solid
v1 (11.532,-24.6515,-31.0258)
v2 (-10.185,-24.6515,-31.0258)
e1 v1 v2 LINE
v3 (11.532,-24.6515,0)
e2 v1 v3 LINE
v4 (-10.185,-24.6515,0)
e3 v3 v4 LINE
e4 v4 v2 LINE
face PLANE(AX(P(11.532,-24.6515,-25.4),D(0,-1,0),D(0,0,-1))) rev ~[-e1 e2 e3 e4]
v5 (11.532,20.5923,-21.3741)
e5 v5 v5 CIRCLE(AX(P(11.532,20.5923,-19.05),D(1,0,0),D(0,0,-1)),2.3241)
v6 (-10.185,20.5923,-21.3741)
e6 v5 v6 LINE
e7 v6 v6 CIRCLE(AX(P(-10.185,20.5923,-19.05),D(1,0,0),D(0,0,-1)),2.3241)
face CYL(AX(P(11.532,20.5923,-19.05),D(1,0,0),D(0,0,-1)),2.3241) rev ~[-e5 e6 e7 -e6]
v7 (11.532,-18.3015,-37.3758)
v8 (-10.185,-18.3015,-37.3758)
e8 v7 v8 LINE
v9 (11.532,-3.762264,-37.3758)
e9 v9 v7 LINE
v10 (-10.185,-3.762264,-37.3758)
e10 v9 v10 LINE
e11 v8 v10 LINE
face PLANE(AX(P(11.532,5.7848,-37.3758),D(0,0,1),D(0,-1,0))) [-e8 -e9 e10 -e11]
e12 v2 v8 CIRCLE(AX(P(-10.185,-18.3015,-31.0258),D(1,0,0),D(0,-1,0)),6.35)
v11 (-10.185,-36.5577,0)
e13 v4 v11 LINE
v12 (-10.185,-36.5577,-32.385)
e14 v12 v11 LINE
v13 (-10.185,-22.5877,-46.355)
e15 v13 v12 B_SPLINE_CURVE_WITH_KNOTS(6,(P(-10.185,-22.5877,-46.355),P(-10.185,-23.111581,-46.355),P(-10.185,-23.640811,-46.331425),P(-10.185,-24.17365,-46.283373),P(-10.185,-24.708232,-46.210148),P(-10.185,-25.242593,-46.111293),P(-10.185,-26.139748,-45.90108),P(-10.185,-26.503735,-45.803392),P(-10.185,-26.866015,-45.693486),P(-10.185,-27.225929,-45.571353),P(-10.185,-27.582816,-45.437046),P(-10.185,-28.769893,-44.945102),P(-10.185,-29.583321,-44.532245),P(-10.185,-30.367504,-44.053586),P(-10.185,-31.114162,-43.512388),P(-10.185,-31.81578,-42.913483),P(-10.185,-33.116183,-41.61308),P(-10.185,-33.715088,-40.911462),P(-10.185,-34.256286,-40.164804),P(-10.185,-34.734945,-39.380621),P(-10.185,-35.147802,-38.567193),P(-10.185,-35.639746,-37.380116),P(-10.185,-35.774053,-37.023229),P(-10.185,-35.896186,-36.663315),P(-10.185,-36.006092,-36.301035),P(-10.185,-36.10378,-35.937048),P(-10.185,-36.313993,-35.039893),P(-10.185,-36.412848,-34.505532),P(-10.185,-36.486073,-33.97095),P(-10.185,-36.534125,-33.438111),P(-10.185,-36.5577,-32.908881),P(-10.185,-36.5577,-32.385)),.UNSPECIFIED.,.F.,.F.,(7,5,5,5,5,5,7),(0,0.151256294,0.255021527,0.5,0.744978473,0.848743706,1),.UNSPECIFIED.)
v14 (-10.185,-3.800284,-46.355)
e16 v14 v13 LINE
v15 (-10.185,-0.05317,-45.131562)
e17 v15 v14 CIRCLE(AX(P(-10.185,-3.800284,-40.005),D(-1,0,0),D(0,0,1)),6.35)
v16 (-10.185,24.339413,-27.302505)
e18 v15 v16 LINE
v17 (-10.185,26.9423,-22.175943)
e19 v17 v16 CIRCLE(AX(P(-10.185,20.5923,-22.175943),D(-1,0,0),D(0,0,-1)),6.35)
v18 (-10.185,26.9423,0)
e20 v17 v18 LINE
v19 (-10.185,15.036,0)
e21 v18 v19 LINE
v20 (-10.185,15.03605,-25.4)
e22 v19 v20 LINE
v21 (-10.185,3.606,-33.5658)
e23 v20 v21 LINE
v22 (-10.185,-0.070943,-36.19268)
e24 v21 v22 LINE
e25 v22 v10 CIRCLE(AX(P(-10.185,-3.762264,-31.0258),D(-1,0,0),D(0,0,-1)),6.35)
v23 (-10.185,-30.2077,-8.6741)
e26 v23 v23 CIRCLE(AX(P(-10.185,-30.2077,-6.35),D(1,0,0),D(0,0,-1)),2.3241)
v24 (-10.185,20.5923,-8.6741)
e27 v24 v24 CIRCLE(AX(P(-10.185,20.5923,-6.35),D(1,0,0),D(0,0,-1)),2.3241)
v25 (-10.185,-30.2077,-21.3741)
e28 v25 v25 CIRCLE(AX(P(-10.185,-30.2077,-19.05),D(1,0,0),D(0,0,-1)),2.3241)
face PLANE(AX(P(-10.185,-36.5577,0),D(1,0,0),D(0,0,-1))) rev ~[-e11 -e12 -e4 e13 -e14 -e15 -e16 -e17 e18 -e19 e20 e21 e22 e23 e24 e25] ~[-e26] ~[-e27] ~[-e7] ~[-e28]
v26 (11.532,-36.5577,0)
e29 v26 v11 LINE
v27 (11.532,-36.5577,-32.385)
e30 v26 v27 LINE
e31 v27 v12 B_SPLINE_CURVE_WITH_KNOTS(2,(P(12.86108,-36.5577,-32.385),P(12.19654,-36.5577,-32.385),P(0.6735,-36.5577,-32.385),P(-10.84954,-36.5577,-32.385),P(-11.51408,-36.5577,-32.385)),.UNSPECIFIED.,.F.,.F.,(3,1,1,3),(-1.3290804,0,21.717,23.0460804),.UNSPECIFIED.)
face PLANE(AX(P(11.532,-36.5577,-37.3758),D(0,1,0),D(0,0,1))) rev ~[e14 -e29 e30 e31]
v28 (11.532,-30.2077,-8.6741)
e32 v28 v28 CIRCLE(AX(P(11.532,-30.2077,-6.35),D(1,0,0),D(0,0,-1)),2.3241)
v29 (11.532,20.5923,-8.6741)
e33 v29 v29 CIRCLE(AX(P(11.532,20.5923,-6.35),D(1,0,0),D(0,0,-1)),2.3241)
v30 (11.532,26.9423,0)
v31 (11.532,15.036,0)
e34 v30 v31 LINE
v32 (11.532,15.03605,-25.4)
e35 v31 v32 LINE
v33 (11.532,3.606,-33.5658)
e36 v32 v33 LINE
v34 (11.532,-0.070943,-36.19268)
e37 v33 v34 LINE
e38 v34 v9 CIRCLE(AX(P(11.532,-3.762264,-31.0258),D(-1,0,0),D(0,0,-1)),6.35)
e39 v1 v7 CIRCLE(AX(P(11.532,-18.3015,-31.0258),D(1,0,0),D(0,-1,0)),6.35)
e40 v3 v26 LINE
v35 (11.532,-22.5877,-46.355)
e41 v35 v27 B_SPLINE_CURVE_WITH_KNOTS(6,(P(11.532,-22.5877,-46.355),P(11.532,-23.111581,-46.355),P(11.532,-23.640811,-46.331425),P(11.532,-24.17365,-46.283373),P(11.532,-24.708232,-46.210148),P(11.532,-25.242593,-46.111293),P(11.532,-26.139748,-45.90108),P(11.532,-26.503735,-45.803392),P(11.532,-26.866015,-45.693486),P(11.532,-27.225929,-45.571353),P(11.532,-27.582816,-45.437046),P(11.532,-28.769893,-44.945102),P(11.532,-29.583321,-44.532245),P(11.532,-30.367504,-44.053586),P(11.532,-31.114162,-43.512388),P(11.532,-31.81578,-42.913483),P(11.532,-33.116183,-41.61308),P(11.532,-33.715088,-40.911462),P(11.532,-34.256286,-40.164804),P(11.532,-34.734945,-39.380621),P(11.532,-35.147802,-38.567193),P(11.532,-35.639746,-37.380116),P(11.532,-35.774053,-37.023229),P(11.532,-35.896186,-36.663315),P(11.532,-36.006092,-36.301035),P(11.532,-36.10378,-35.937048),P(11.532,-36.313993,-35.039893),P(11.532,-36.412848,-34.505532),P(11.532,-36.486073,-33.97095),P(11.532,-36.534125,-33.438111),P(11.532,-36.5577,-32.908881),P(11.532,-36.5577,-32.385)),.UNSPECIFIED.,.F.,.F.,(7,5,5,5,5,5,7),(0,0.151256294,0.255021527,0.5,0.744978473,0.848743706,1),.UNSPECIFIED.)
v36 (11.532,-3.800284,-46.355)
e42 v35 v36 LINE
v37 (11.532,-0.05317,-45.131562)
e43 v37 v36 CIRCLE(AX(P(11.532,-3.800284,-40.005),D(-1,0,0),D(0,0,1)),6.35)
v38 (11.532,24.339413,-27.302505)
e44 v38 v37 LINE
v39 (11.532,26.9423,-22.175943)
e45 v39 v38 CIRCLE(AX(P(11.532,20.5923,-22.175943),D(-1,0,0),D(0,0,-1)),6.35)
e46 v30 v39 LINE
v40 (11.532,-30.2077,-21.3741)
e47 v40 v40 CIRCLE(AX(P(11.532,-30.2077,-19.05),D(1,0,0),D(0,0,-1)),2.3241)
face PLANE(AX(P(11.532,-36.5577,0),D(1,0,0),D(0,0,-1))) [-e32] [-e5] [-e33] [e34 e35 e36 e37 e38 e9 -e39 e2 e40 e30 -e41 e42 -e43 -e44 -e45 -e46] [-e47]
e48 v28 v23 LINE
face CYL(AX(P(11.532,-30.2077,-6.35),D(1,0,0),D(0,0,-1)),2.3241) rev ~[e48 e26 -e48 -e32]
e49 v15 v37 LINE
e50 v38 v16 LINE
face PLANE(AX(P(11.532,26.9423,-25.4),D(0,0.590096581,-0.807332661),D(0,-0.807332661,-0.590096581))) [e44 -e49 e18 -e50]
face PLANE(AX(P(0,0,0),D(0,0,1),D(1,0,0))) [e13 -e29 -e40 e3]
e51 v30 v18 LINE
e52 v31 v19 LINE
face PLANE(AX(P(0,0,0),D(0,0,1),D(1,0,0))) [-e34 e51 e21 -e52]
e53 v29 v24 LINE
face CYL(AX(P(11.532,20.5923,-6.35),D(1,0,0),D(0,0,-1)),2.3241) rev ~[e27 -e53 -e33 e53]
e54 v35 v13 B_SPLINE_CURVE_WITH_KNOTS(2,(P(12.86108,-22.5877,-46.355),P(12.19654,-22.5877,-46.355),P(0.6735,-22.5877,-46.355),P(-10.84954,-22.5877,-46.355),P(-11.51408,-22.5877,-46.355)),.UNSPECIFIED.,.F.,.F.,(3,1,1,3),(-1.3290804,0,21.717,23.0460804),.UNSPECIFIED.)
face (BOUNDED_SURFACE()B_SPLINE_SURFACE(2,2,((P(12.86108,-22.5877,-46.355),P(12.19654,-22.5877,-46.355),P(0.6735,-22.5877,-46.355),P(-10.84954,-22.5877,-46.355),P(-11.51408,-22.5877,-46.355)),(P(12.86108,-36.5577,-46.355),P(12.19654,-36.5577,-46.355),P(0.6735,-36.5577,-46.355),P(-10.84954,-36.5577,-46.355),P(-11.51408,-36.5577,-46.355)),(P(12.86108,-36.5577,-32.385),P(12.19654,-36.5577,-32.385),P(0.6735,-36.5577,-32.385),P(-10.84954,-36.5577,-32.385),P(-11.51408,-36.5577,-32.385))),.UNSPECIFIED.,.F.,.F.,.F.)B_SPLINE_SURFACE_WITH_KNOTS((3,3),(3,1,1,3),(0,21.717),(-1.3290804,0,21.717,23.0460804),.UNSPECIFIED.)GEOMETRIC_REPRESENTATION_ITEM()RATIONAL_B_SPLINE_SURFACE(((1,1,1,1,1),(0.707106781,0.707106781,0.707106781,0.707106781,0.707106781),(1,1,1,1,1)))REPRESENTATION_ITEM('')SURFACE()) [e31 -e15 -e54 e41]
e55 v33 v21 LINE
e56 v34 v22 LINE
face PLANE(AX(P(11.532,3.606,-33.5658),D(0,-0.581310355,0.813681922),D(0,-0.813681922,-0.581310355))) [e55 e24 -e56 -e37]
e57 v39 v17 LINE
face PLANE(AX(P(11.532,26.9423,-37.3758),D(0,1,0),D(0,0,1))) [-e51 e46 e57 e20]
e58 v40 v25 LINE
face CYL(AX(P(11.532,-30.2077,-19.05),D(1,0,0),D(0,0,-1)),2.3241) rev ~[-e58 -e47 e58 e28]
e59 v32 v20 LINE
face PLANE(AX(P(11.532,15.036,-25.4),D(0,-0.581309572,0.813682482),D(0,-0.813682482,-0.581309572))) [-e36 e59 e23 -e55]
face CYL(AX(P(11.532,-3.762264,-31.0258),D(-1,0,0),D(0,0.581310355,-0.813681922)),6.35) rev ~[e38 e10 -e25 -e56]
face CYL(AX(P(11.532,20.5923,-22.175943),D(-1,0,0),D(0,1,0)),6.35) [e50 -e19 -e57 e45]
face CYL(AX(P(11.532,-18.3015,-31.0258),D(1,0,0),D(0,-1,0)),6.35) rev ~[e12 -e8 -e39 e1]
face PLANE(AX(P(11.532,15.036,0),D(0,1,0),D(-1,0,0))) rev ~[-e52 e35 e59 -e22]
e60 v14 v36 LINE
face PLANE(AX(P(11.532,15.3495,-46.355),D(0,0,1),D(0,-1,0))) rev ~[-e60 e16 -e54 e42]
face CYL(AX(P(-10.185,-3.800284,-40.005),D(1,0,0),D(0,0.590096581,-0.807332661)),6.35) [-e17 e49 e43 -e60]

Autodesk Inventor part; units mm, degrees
ref_plane "YZ Plane" through (0, 0, 0) normal (1, 0, 0) x (0, 1, 0)
ref_plane "XZ Plane" through (0, 0, 0) normal (0, 1, 0) x (-1, 0, 0)
ref_plane "XY Plane" through (0, 0, 0) normal (0, 0, 1) x (1, 0, 0)
sketch "Sketch4" plane through (0, 0, 0) normal (0, 0, 1) x (1, 0, 0)
  line L0 (10.9923, 14.2423) -> (-9.6452, 14.2423)
  line L1 (11.786, 15.036) -> (11.786, 25.9263)
  line L2 (13.3735, 26.9423) -> (11.786, 26.9423)
  line L3 (-10.439, 15.036) -> (-10.439, 25.9263)
  line L4 (-10.439, 26.9423) -> (-12.0265, 26.9423)
  arc A0 (-10.439, 15.036) -> (-9.6452, 14.2423) centre (-9.6452, 15.036) ccw
  arc A1 (10.9923, 14.2423) -> (11.786, 15.036) centre (10.9923, 15.036) ccw
  arc A2 (11.786, -24.6515) -> (10.9923, -23.8577) centre (10.9923, -24.6515) ccw
  line L5 (-9.6452, -23.8577) -> (10.9923, -23.8577)
  arc A3 (-9.6452, -23.8577) -> (-10.439, -24.6515) centre (-9.6452, -24.6515) ccw
  line L6 (-10.439, -24.6515) -> (-10.439, -36.5577)
  line L7 (11.786, -24.6515) -> (11.786, -36.5577)
  line L8 (11.786, 26.9423) -> (11.786, 25.9263)
  line L9 (-10.439, 26.9423) -> (-10.439, 25.9263)
  line L10 (11.786, -24.6515) -> (-10.439, -24.6515)
  line L11 (11.786, 15.036) -> (-10.439, 15.036)
  line L12 (11.786, 26.9423) -> (11.532, 26.9423)
  line L13 (11.532, 26.9423) -> (11.532, 15.036)
  line L14 (-10.439, 26.9423) -> (-10.185, 26.9423)
  line L15 (-10.185, 26.9423) -> (-10.185, 15.036)
  line L16 (11.532, 26.9423) -> (-10.185, 26.9423)
  line L17 (11.786, -24.6515) -> (11.532, -24.6515)
  line L18 (11.532, -24.6515) -> (11.532, -36.5577)
  line L19 (11.532, -36.5577) -> (11.786, -36.5577)
  line L20 (11.786, -36.5577) -> (11.786, -24.6515)
  line L21 (-10.439, -24.6515) -> (-10.185, -24.6515)
  line L22 (-10.185, -24.6515) -> (-10.185, -36.5577)
  line L23 (-10.185, -36.5577) -> (-10.439, -36.5577)
  line L24 (-10.439, -36.5577) -> (-10.439, -24.6515)
  line L25 (11.532, -36.5577) -> (-10.439, -36.5577)
  line L26 (0, 14.2423) -> (0, -23.8577)
  point P0 (0, 0)
  dimension "d5" = 22.225
  dimension "d6" = 0.254
  dimension "d7" = 0.254
  dimension "d14" = 38.1
extrude "Extrusion2" add sketch "Sketch4" against normal blind 25.4 contours L11 L15 L16 L13 | L18 L25 L22 L10
sketch "Sketch5" plane through (11.532, -36.5577, 0) normal (1, 0, 0) x (0, 0, -1)
  point P0 (0, 36.5577)
sketch "Sketch6" plane through (11.532, -36.5577, 0) normal (1, 0, 0) x (0, 0, -1)
  line L0 (0, 51.5938) -> (0, 63.5) projected
  line L1 (0, 51.5938) -> (25.4, 51.5938) projected
  line L2 (25.4, 63.5) -> (25.4, 51.5938) projected
  line L3 (0, 63.5) -> (25.4, 63.5) projected
  line L4 (0, 0) -> (0, 11.9062) projected
  line L5 (0, 0) -> (25.4, 0) projected
  line L6 (25.4, 11.9062) -> (25.4, 0) projected
  line L7 (0, 11.9062) -> (25.4, 11.9062) projected
  line L8 (25.4, 63.5) -> (25.4, 57.15)
  line L9 (25.4, 57.15) -> (19.05, 57.15)
  line L10 (25.4, 0) -> (25.4, 6.35)
  line L11 (25.4, 6.35) -> (19.05, 6.35)
  line L12 (25.4, 62.484) -> (25.4, 51.5938)
  line L13 (37.3758, 42.3425) -> (37.3758, 45.2438)
  line L14 (37.3758, 63.5) -> (25.4, 63.5)
  line L15 (37.3758, 0) -> (25.4, 0)
  line L16 (25.4, 63.5) -> (37.3758, 63.5)
  line L17 (46.355, 51.9072) -> (46.355, 11.5928)
  line L18 (37.3758, 0) -> (25.4, 0)
  line L19 (25.4, 51.5938) -> (31.0258, 51.5938)
  line L20 (25.4, 11.9062) -> (31.0258, 11.9062)
  arc A0 (37.3758, 45.2438) -> (31.0258, 51.5938) centre (31.0258, 45.2438) ccw
  line L21 (46.355, 51.9072) -> (46.355, 50.8)
  arc A1 (46.355, 50.8) -> (37.3758, 63.5) centre (33.6671, 51.3536) ccw
  arc A2 (31.0258, 11.9062) -> (37.3758, 18.2562) centre (31.0258, 18.2562) ccw
  line L22 (46.355, 11.5928) -> (46.355, 12.7)
  arc A3 (37.3758, 0) -> (46.355, 12.7) centre (33.6671, 12.1464) ccw
  line L23 (37.3758, 42.3425) -> (37.3758, 18.2562)
  line L24 (25.4, 6.35) -> (19.05, 6.35)
  circle A4 centre (19.05, 57.15) radius 2.3241
  circle A5 centre (6.35, 57.15) radius 2.3241
  line L25 (25.4, 6.35) -> (19.05, 6.35)
  circle A6 centre (19.05, 6.35) radius 2.3241
  line L26 (19.05, 6.35) -> (6.35, 6.35)
  circle A7 centre (6.35, 6.35) radius 2.3241
  point P0 (0, 36.5577)
  dimension "d15" = 6.35
  dimension "d16" = 6.35
  dimension "d17" = 6.35
  dimension "d35" = 4.6482
  dimension "d36" = 4.6482
  dimension "d37" = 12.7
  dimension "d38" = 4.6482
extrude "Extrusion3" add sketch "Sketch6" against normal up to surface (21.717 mm away) contours L2 L14 A1 L17 A3 L15 L6 L20 A2 L23 L13 A0 L19
extrude "Extrusion4" cut sketch "Sketch6" along normal through all both and the other way through all contours A6 L26 L11 | L11 L26 A6 | A4 | A5 | A7
fillet "Fillet1" radius 13.97 2 edges at (0.6735, 26.9423, -37.3758) (0.6735, -36.5577, -37.3758)
fillet_without_effect "Fillet2"
sketch "Sketch7" plane through (11.532, 15.036, 0) normal (1, 0, 0) x (0, 0, -1)
  arc A0 (37.3758, -6.35) -> (31.0258, 0) centre (31.0258, -6.35) ccw
  line L0 (0, 0) -> (31.0258, 0)
  line L1 (0, 11.9063) -> (32.385, 11.9063)
  arc A1 (46.355, -2.0638) -> (32.385, 11.9063) centre (32.385, -2.0637) ccw
  line L2 (46.355, -37.6238) -> (46.355, -2.0638)
  arc A2 (31.0258, -39.6875) -> (37.3758, -33.3375) centre (31.0258, -33.3375) ccw
  line L3 (37.3758, -6.35) -> (37.3758, -33.3375)
  arc A3 (32.385, -51.5938) -> (46.355, -37.6238) centre (32.385, -37.6238) ccw
  line L4 (0, -39.6875) -> (31.0258, -39.6875)
  line L5 (0, -51.5938) -> (32.385, -51.5938)
  line L6 (37.3758, -6.35) -> (37.3758, -11.43)
  line L7 (37.3758, -11.43) -> (24.169, -11.43)
  line L8 (25.4, 10.8903) -> (25.4, 0)
  line L9 (37.3758, -11.43) -> (33.5658, -11.43)
  line L10 (25.4, 0) -> (33.5658, -11.43)
  line L11 (33.5658, -11.43) -> (37.3758, -16.763)
  line L12 (37.3758, -16.763) -> (46.355, -16.763)
  line L13 (25.4, 0) -> (25.4, 11.9063)
  line L14 (25.4, 11.9063) -> (46.355, -16.763)
  arc A4 (32.385, -51.5938) -> (46.355, -37.6238) centre (32.385, -37.6238) ccw projected
  line L15 (46.355, -37.6238) -> (46.355, -2.0638) projected
  arc A5 (46.355, -2.0638) -> (32.385, 11.9063) centre (32.385, -2.0637) ccw projected
  line L16 (0, 11.9063) -> (32.385, 11.9063) projected
  line L17 (0, 0) -> (0, 11.9063) projected
  line L18 (0, 0) -> (31.0258, 0) projected
  arc A6 (37.3758, -6.35) -> (31.0258, 0) centre (31.0258, -6.35) ccw projected
  line L19 (37.3758, -6.35) -> (37.3758, -33.3375) projected
  arc A7 (31.0258, -39.6875) -> (37.3758, -33.3375) centre (31.0258, -33.3375) ccw projected
  line L20 (0, -39.6875) -> (31.0258, -39.6875) projected
  line L21 (0, -51.5938) -> (0, -39.6875) projected
  line L22 (0, -51.5938) -> (32.385, -51.5938) projected
  circle A8 centre (19.05, -45.2438) radius 2.3241 projected
  circle A9 centre (6.35, 5.5563) radius 2.3241 projected
  circle A10 centre (6.35, -45.2438) radius 2.3241 projected
  circle A11 centre (19.05, 5.5563) radius 2.3241 projected
  line L23 (46.355, -37.6238) -> (43.4517, -37.6238)
  point P0 (0, -15.036)
  point P1 (36.7783, -3.6607)
  point P2 (35.3345, -1.6854)
  dimension "d43" = 5.08
  dimension "d44" = 3.81
extrude "Extrusion5" add sketch "Sketch7" against normal up to surface (21.717 mm away) contours L3 L7 L10 L0 A0 L14 | L3 L11 L7
extrude "Extrusion6" cut sketch "Sketch7" along normal through all both and the other way through all contours A0 L14 L1 A1 L2
fillet "Fillet3" radius 6.35 2 edges at (0.6735, 26.9423, -25.4) (0.6735, -1.727, -46.355)
fillet "Fillet4" radius 6.35 1 edges at (0.6735, -1.727, -37.3758)
properties part number "Front_support_Intake"
